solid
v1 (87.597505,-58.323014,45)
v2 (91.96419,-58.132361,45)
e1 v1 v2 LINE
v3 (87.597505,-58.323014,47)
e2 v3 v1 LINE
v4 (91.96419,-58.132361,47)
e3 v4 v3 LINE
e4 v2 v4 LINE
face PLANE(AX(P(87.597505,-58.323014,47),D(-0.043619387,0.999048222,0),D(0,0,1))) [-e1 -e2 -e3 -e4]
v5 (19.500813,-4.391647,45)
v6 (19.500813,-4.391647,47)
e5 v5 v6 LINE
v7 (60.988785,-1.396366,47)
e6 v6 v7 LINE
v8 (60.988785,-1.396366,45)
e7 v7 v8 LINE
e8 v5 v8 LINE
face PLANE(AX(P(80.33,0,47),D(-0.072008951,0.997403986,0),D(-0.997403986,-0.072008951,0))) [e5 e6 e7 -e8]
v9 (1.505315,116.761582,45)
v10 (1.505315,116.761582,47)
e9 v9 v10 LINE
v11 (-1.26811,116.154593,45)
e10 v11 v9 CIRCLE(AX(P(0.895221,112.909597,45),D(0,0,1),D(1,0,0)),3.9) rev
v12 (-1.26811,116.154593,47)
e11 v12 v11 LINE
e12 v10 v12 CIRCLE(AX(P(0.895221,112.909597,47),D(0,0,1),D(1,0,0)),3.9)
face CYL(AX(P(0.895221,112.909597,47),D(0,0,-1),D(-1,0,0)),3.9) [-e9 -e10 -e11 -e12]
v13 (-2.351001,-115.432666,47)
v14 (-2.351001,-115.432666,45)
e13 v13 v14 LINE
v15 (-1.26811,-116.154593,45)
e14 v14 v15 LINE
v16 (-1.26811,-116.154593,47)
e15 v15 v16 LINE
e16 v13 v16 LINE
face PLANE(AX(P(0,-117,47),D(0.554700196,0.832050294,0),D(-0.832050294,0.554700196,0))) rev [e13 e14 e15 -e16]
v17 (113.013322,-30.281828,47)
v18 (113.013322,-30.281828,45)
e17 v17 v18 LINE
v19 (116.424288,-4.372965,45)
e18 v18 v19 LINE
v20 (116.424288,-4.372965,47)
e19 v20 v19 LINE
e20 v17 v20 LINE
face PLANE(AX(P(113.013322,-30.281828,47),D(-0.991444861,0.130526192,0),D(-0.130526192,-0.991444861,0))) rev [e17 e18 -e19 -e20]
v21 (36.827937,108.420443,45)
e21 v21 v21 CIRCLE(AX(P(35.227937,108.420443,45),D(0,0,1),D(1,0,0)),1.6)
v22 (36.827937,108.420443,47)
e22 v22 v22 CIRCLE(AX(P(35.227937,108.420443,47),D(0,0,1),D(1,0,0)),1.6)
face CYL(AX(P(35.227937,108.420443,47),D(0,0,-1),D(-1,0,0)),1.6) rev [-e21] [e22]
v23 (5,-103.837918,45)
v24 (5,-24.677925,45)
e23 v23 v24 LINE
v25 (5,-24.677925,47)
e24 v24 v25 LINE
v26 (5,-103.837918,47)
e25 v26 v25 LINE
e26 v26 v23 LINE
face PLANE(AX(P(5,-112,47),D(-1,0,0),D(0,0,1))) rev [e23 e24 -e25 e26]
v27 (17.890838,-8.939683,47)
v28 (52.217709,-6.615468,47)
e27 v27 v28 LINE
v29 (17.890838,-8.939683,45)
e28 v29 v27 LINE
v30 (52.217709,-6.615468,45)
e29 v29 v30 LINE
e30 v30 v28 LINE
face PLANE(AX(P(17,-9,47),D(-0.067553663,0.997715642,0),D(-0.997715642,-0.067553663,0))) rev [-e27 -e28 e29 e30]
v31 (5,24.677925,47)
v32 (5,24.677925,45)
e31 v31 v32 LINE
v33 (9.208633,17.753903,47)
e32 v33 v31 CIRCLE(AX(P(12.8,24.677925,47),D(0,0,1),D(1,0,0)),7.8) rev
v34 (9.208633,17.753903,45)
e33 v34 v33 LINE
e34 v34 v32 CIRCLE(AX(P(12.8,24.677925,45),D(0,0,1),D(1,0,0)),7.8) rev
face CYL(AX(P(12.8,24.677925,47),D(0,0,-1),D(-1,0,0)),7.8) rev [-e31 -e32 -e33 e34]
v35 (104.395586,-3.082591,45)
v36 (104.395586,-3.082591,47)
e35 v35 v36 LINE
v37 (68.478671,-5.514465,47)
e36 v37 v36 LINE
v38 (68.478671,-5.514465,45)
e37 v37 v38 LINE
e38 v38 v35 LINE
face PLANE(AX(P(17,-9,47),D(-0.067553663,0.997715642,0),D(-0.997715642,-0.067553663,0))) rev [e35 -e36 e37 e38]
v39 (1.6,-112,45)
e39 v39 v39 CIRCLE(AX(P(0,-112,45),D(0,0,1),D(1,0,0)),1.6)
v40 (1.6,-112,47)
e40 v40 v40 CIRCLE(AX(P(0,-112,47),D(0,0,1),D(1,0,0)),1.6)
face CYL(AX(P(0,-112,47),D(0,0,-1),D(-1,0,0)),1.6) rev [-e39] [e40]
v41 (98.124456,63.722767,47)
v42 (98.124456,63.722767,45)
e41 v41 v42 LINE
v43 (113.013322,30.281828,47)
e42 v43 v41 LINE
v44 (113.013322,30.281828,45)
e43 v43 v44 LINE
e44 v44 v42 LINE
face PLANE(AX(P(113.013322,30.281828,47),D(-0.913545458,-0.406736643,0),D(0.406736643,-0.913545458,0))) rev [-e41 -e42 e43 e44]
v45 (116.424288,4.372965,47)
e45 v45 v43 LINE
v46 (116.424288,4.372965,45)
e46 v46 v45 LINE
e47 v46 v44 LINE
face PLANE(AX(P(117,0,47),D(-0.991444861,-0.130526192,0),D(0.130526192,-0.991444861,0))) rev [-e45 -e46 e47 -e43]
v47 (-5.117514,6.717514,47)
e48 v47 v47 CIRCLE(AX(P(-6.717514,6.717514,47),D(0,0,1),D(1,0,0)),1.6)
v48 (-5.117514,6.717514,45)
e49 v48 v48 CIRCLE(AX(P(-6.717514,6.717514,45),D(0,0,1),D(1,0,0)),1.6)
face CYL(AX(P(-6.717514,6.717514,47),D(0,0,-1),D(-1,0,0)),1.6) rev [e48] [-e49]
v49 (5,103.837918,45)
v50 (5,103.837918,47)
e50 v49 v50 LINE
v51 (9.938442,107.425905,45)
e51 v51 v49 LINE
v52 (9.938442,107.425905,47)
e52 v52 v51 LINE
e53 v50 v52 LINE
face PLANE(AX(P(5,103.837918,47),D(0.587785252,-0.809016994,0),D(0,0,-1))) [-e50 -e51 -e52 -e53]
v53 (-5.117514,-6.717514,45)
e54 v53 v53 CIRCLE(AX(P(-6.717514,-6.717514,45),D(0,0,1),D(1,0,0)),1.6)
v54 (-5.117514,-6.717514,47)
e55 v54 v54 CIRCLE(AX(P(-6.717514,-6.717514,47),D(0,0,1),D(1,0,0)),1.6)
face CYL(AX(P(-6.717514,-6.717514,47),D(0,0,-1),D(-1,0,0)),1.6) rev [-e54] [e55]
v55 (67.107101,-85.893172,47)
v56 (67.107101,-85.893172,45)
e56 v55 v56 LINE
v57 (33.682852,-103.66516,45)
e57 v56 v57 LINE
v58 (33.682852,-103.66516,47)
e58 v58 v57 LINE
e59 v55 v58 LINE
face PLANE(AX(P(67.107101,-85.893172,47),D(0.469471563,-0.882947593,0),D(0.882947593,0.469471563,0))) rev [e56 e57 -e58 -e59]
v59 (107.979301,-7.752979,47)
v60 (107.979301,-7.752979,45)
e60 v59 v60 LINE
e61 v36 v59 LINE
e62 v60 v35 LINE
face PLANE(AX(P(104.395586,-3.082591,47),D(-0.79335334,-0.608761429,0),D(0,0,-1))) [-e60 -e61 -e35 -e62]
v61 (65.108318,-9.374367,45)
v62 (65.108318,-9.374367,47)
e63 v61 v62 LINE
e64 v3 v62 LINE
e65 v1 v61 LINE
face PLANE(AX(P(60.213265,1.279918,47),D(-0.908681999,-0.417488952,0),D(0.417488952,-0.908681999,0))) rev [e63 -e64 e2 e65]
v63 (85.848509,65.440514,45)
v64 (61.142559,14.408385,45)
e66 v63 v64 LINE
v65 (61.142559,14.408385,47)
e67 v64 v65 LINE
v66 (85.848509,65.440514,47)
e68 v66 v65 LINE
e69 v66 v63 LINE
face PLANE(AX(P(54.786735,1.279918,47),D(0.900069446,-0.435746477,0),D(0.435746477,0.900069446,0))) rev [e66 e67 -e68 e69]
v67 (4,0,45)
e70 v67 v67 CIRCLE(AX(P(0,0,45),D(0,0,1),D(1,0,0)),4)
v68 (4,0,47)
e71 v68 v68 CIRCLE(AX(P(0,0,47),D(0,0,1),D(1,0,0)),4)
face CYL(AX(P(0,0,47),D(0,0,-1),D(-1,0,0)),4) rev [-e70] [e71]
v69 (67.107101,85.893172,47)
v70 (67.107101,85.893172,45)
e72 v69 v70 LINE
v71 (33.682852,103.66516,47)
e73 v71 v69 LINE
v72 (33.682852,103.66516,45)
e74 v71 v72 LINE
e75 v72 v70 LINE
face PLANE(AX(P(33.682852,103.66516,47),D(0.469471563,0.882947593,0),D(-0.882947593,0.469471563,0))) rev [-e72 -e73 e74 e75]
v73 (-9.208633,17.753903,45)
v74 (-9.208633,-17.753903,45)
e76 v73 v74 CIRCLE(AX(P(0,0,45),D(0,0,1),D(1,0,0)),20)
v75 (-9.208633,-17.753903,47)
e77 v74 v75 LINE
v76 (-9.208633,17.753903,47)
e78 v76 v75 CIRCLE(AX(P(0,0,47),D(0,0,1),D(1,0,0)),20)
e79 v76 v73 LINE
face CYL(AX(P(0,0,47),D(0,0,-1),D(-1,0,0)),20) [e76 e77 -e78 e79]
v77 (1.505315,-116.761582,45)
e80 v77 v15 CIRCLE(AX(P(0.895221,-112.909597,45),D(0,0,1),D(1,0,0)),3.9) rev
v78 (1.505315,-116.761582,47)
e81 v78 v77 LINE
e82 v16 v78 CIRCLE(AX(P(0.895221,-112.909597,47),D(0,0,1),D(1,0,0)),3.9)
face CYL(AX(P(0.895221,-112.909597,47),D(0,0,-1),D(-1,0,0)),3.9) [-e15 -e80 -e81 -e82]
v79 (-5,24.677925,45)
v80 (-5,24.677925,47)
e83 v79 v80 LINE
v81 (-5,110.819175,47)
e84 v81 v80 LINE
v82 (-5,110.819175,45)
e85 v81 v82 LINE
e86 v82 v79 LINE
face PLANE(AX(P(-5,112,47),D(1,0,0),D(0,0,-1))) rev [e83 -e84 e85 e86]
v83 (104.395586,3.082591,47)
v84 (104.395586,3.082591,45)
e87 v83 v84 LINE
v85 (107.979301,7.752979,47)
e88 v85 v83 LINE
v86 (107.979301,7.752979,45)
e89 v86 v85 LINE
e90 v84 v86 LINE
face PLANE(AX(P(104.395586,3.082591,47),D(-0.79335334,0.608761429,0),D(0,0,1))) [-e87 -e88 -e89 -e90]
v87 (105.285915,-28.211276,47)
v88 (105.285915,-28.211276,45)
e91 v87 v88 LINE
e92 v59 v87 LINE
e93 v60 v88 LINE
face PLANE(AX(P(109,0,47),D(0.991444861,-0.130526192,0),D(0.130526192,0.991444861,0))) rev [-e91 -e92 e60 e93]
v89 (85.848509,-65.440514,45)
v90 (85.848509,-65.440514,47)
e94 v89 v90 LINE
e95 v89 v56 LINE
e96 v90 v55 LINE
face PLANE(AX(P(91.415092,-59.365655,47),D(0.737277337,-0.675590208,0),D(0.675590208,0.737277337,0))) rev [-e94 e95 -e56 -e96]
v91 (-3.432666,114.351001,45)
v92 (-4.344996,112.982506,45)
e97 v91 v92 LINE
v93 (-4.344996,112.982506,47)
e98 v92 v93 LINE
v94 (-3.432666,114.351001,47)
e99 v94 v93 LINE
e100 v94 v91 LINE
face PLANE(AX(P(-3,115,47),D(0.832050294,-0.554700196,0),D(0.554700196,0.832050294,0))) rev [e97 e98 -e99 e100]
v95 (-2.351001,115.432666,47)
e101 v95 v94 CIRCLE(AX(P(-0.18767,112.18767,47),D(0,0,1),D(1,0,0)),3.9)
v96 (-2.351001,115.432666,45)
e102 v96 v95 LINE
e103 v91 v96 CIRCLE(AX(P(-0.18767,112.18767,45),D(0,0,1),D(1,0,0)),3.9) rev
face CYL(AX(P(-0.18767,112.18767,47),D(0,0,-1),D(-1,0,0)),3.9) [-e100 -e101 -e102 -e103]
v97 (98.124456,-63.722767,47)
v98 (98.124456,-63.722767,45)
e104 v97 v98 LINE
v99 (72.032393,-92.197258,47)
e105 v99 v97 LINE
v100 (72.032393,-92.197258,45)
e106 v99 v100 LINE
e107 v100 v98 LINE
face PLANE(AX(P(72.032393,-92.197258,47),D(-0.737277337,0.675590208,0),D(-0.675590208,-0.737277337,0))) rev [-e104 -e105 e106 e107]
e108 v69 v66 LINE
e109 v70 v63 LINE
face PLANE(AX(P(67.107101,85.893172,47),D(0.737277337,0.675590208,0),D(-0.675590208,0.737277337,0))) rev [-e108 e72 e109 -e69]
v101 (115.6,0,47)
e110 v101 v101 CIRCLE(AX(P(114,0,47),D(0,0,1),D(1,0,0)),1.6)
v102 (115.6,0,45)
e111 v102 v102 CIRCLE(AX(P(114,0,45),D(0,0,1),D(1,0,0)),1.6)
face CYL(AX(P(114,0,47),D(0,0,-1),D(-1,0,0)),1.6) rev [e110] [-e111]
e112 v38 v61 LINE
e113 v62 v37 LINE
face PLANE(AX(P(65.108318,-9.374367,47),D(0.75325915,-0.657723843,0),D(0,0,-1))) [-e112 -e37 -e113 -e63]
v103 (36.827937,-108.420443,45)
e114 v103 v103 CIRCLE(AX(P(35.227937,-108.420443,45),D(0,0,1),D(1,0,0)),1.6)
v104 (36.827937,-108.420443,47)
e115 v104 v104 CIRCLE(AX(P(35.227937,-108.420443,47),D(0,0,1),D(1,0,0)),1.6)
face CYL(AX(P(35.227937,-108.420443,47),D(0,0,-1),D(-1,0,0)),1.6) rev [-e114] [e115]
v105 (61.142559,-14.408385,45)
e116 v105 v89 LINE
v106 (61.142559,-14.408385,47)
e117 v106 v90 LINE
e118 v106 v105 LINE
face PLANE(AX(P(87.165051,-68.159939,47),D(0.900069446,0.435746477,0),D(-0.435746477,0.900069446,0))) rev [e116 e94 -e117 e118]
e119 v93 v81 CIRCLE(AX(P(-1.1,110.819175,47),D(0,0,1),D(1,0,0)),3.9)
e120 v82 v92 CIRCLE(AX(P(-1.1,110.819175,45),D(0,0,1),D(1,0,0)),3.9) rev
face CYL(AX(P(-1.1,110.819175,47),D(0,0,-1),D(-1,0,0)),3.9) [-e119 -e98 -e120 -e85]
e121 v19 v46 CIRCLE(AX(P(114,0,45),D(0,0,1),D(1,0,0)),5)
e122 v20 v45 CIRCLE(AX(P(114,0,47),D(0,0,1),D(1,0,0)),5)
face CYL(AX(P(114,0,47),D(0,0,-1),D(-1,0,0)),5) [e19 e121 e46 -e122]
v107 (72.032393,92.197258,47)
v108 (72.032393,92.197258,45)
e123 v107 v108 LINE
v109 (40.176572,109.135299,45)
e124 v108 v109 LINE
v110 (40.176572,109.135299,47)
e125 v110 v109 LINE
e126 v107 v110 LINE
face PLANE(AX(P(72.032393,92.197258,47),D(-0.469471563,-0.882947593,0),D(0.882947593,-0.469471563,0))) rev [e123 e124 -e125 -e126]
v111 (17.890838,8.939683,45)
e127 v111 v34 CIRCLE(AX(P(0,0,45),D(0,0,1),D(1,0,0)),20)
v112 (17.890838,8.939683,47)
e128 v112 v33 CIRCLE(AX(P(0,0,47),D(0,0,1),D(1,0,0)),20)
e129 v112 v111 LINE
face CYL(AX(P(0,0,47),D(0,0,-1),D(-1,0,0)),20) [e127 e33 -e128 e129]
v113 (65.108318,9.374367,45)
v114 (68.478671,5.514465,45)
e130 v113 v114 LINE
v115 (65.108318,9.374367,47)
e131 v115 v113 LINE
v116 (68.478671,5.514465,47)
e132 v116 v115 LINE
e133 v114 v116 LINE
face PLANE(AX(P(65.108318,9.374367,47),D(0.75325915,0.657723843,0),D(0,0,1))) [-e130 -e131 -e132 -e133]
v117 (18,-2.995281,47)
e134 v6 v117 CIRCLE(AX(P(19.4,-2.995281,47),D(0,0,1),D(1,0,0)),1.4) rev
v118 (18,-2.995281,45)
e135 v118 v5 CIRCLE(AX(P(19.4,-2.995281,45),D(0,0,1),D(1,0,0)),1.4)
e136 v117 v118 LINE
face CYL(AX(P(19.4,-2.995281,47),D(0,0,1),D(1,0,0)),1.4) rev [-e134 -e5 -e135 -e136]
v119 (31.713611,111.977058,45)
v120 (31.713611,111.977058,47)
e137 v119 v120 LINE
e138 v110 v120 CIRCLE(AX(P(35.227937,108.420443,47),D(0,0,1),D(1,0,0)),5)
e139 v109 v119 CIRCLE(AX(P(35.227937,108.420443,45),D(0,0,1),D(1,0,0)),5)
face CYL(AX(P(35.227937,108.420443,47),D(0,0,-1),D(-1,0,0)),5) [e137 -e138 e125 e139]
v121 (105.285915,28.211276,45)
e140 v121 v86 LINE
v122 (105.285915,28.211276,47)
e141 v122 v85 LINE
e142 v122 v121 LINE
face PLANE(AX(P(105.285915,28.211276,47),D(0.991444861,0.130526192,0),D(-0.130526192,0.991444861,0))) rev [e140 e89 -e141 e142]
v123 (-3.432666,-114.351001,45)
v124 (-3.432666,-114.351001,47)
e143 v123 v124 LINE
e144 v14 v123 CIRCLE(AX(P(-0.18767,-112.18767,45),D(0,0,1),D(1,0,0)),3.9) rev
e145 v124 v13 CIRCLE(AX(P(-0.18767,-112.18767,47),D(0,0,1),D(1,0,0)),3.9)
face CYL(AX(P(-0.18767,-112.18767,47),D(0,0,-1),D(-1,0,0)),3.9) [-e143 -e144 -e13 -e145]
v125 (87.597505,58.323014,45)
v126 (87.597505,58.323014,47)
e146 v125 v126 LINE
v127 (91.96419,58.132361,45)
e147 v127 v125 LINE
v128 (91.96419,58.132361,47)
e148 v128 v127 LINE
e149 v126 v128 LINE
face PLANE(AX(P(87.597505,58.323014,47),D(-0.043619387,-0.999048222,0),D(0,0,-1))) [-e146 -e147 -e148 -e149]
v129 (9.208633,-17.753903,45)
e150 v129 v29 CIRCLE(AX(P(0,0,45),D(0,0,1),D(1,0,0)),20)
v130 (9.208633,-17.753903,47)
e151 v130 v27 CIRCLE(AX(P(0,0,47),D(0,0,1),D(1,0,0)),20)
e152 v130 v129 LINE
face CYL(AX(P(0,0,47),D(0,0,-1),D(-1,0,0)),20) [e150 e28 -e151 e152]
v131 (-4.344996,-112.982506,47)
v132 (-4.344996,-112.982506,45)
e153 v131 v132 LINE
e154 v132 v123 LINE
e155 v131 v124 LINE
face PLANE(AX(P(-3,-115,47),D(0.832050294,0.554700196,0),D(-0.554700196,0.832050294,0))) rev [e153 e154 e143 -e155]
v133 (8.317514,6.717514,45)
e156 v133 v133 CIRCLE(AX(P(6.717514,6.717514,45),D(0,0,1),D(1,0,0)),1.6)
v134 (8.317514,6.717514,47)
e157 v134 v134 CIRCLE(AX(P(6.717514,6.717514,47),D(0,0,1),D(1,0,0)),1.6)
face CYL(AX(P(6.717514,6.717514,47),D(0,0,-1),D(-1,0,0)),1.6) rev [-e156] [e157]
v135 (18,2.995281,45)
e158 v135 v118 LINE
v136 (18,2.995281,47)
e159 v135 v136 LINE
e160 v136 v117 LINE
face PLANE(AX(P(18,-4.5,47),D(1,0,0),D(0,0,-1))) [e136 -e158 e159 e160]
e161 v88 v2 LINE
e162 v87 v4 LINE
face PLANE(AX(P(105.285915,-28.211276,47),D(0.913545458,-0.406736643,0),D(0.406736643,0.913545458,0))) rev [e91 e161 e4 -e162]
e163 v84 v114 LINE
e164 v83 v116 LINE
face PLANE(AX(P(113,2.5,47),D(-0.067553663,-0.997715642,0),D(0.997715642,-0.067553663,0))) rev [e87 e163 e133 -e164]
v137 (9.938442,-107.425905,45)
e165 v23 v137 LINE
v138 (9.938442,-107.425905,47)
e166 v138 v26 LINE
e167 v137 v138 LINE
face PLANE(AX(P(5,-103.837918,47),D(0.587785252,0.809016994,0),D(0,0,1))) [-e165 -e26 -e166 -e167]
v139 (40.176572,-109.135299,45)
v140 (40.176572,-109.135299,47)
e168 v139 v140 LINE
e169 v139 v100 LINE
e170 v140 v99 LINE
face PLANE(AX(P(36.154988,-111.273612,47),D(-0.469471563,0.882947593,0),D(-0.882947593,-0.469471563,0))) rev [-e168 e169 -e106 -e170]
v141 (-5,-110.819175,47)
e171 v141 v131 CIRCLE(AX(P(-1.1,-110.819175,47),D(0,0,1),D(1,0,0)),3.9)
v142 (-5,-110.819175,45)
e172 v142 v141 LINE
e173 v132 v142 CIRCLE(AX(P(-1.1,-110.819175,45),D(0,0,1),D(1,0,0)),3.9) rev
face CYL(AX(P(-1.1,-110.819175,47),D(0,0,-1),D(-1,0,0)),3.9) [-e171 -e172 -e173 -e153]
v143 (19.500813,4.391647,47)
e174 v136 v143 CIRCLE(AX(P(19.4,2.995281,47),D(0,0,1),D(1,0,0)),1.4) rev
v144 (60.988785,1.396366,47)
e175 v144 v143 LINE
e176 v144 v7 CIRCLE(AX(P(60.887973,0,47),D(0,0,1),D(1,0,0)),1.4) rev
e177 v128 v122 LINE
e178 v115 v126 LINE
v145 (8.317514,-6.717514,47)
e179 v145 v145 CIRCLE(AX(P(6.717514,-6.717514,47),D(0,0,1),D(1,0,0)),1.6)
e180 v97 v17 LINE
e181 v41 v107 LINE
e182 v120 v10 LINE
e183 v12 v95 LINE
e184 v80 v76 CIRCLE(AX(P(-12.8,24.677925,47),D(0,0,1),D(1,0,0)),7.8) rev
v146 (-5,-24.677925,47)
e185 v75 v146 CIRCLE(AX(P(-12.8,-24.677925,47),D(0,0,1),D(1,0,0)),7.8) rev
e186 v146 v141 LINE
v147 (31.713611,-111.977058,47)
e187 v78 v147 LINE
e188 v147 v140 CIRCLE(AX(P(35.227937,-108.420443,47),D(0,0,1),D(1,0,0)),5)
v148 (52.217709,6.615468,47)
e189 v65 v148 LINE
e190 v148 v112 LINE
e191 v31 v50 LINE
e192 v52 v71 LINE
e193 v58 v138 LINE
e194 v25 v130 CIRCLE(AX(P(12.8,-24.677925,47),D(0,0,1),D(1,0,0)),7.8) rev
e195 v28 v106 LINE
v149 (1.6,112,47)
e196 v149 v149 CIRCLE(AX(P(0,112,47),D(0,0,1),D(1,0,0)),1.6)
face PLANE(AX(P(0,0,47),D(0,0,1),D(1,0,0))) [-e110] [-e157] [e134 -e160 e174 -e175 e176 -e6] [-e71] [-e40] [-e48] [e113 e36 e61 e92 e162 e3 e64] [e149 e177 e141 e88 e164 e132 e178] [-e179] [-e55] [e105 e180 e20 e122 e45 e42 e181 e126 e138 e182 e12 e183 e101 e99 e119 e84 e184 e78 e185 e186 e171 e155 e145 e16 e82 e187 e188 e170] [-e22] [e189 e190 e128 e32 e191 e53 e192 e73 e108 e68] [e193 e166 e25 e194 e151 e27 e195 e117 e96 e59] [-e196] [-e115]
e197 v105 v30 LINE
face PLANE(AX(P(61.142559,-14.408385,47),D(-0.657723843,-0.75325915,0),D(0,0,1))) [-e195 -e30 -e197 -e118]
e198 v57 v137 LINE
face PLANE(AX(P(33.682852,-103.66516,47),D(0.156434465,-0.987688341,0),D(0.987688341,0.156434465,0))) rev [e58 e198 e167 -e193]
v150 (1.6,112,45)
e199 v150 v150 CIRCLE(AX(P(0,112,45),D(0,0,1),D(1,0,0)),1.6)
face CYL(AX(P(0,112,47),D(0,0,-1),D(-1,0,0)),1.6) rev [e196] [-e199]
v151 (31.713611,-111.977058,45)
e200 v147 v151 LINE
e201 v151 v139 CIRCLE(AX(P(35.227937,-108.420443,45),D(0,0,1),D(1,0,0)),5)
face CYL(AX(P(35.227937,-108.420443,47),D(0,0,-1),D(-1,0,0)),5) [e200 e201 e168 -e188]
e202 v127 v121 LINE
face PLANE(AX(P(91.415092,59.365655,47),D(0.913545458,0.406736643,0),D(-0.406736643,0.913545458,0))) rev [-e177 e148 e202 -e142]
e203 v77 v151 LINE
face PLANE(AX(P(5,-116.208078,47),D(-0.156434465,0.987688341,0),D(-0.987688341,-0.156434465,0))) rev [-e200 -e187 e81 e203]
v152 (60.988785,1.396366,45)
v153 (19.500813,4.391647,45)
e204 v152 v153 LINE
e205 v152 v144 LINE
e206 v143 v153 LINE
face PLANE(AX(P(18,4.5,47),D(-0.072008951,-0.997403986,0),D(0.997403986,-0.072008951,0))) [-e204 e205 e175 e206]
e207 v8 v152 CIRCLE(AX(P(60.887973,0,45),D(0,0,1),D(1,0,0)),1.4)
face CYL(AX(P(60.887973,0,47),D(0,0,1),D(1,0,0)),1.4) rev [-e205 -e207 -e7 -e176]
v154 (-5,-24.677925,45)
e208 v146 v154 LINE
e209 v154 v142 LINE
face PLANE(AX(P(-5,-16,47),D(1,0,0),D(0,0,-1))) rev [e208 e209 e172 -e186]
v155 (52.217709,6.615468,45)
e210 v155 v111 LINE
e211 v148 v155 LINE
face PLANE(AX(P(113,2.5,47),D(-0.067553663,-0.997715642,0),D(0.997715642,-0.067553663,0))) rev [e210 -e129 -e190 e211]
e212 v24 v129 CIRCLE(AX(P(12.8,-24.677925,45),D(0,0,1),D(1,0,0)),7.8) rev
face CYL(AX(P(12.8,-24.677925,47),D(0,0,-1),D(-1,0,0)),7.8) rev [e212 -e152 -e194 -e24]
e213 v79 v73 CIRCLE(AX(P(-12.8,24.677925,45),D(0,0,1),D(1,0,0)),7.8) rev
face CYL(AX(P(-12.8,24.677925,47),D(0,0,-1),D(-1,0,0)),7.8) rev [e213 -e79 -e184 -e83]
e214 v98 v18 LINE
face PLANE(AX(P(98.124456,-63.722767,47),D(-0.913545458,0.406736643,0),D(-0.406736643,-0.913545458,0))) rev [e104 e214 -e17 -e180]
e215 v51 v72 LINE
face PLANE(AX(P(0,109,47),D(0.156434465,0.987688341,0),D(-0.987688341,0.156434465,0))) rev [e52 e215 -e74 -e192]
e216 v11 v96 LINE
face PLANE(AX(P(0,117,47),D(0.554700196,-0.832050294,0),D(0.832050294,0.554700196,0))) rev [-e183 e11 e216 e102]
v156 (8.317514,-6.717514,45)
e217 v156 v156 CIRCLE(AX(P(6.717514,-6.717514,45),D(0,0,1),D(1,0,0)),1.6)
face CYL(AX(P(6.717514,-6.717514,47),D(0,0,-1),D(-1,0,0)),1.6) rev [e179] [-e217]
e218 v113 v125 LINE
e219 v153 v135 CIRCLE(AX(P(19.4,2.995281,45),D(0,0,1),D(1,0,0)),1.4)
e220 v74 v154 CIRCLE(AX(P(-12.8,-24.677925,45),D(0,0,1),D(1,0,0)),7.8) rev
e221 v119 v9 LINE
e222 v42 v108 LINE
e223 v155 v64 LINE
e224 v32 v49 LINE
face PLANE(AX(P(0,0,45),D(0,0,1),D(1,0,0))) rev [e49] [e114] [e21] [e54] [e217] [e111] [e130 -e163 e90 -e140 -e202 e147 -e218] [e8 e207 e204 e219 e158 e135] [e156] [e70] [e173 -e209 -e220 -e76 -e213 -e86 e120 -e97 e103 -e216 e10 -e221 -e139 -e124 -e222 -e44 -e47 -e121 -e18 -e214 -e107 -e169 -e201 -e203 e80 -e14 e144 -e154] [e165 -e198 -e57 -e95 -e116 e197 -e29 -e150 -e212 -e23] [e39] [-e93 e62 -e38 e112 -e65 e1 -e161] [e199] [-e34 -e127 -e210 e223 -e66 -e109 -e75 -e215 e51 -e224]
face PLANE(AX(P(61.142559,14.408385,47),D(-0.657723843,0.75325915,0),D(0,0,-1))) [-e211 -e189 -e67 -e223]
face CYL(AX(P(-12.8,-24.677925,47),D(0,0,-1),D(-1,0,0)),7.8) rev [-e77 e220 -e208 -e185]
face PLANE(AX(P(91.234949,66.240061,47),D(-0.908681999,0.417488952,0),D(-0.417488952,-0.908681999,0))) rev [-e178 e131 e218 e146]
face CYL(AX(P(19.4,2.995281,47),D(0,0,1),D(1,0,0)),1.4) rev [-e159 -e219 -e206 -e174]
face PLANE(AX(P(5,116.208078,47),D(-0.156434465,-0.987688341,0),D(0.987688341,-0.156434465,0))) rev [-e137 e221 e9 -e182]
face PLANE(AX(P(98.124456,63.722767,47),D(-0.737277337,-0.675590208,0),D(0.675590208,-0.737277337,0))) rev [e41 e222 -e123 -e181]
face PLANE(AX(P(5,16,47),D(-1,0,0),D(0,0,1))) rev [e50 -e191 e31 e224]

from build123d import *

# Parameters (mm, degrees)
EXTRUDE_180_DEPTH      = 8
EXTRUDE_START          = 8
SKETCH_2_W             = 6
SKETCH_2_H             = 4
EXTRUDE_456_DEPTH      = 36
EXTRUDE_START_2        = 44
EXTRUDE_180_2_DEPTH    = 3
SKETCH_4_R             = 20
SKETCH_4_R_2           = 4
EXTRUDE_691_DEPTH      = 3
EXTRUDE_744_DEPTH      = 3
SKETCH_6_W             = 10
SKETCH_6_H             = 96
EXTRUDE_1_DEPTH        = 3
EXTRUDE_Y_1_DEPTH      = 3
SKETCH_8_W             = 10
SKETCH_8_H             = 96
EXTRUDE_1_2_DEPTH      = 3
EXTRUDE_Y_1_2_DEPTH    = 3
CUT_EXTRUDE_START      = 44
CUT_EXTRUDE_1136_DEPTH = 3
EXTRUDE_1227_DEPTH     = 3
SKETCH_12_R            = 5
EXTRUDE_1296_DEPTH     = 8
SKETCH_13_R            = 1.6
CUT_EXTRUDE_1367_DEPTH = 3
SKETCH_14_R            = 1.6
CUT_EXTRUDE_1428_DEPTH = 8
SKETCH_15_W            = 600
SKETCH_15_H            = 600
CUT_EXTRUDE_1488_DEPTH = 44
F_2MM_START            = 44
F_2MM_DEPTH            = 3
SKETCH_17_R            = 5
EXTRUDE_M3_DEPTH       = 3
SKETCH_18_R            = 5
EXTRUDE_3_DEPTH        = 3
SKETCH_19_R            = 5
EXTRUDE_4_DEPTH        = 3
SKETCH_20_R            = 1.6
CUT_EXTRUDE_M3_DEPTH   = 3
R7P8_75_R              = 7.8
R3P9_R                 = 3.9
F_2MM_45_47_START      = 44
SKETCH_21_W            = 600
SKETCH_21_H            = 600
F_2MM_45_47_DEPTH      = 1
FILLET_1_R             = 1.4
CHAMFER_1_SIZE         = 5
CHAMFER_1_SIZE_2       = 4.246045496
CHAMFER_1_SIZE_3       = 3.817956769
CHAMFER_1_SIZE_4       = 4.370160244
CHAMFER_1_SIZE_5       = 3.876090347
CHAMFER_1_SIZE_6       = 9.033398393


with BuildPart() as part:
    # 草图1 → Extrude 180 (new body)
    with BuildSketch(Plane.XY):
        Polygon((0, -115), (35.536954353, -109.371499374), (70.801069662, -90.621236665), (96.447115314, -62.633489027), (111.081470023, -29.764190187), (115, 0), (111.081470023, 29.764190187), (96.447115314, 62.633489027), (70.801069662, 90.621236665), (35.536954353, 109.371499374), (0, 115), (0, 111), (34.300886376, 105.567273309), (68.338423761, 87.46919365), (93.092433042, 60.454932887), (107.217766718, 28.728914006), (111, 0), (107.217766718, -28.728914006), (93.092433042, -60.454932887), (68.338423761, -87.46919365), (34.300886376, -105.567273309), (0, -111), align=None)
    extrude(amount=EXTRUDE_180_DEPTH)

    # 草图2 → Extrude 456 (add)
    with BuildSketch(Plane.XY.offset(EXTRUDE_START)):
        Polygon((35.584965419, -103.047126287), (37.439067386, -108.753465385), (33.634841321, -109.989533363), (31.780739354, -104.283194265), align=None)
        with Locations((112, 0)):
            Rectangle(SKETCH_2_W, SKETCH_2_H)
        Polygon((31.780739354, 104.283194265), (33.634841321, 109.989533363), (37.439067386, 108.753465385), (35.584965419, 103.047126287), align=None)
    extrude(amount=EXTRUDE_456_DEPTH)

    # 草图3 → Extrude 180 2 (add)
    with BuildSketch(Plane.XY.offset(EXTRUDE_START_2)):
        Polygon((0, -115), (35.536954353, -109.371499374), (70.801069662, -90.621236665), (96.447115314, -62.633489027), (111.081470023, -29.764190187), (115, 0), (111.081470023, 29.764190187), (96.447115314, 62.633489027), (70.801069662, 90.621236665), (35.536954353, 109.371499374), (0, 115), (0, 109), (33.682852387, 103.665160276), (67.10710081, 85.893172143), (91.415091906, 59.365654817), (105.285915066, 28.211275916), (109, 0), (105.285915066, -28.211275916), (91.415091906, -59.365654817), (67.10710081, -85.893172143), (33.682852387, -103.665160276), (0, -109), align=None)
    extrude(amount=EXTRUDE_180_2_DEPTH)



with BuildPart() as body_2:
    # 草图4 → Extrude 691 (new body)
    with BuildSketch(Plane.XY.offset(EXTRUDE_START_2)):
        Circle(SKETCH_4_R)
        Circle(SKETCH_4_R_2, mode=Mode.SUBTRACT)
    extrude(amount=EXTRUDE_691_DEPTH)


with BuildPart() as part_1:
    add(part.part)

    add(body_2.part)  # Extrude 744 merges body 2
    # 草图5 → Extrude 744 (add)
    with BuildSketch(Plane.XY.offset(EXTRUDE_START_2)):
        Polygon((17, -9), (113, -2.5), (113, 2.5), (17, 9), align=None)
    extrude(amount=EXTRUDE_744_DEPTH)

    # 草图6 → Extrude 1 (add)
    with BuildSketch(Plane.XY.offset(EXTRUDE_START_2)):
        with Locations((0, -64)):
            Rectangle(SKETCH_6_W, SKETCH_6_H)
    extrude(amount=EXTRUDE_1_DEPTH)

    # 草图7 → Extrude Y__-1 (add)
    with BuildSketch(Plane.XY.offset(EXTRUDE_START_2)):
        Polygon((60.213265383, 1.279918343), (91.234949037, -66.240061243), (87.165050963, -68.159938757), (54.786734617, -1.279918343), align=None)
    extrude(amount=EXTRUDE_Y_1_DEPTH)

    # 草图8 → Extrude 1 2 (add)
    with BuildSketch(Plane.XY.offset(EXTRUDE_START_2)):
        with Locations((0, 64)):
            Rectangle(SKETCH_8_W, SKETCH_8_H)
    extrude(amount=EXTRUDE_1_2_DEPTH)

    # 草图9 → Extrude Y__1 2 (add)
    with BuildSketch(Plane.XY.offset(EXTRUDE_START_2)):
        Polygon((54.786734617, 1.279918343), (87.165050963, 68.159938757), (91.234949037, 66.240061243), (60.213265383, -1.279918343), align=None)
    extrude(amount=EXTRUDE_Y_1_2_DEPTH)

    # 草图10 → Cut-Extrude 1136 (cut)
    with BuildSketch(Plane.XY.offset(CUT_EXTRUDE_START)):
        Polygon((18, -4.5), (18, 4.5), (80.33, 0), align=None)
    extrude(amount=CUT_EXTRUDE_1136_DEPTH, mode=Mode.SUBTRACT)

    # 草图11 → Extrude 1227 (add)
    with BuildSketch(Plane.XY.offset(EXTRUDE_START_2)):
        Polygon((-5, -107), (5, -107), (5, -116.208077798), (0, -117), (-3, -115), (-5, -112), align=None)
        Polygon((-5, 107), (5, 107), (5, 116.208077798), (0, 117), (-3, 115), (-5, 112), align=None)
    extrude(amount=EXTRUDE_1227_DEPTH)

    # 草图12 → Extrude 1296 (add)
    with BuildSketch(Plane.XY):
        with Locations((0, 112)):
            Circle(SKETCH_12_R)
        with Locations((0, -112)):
            Circle(SKETCH_12_R)
    extrude(amount=EXTRUDE_1296_DEPTH)

    # 草图13 → Cut-Extrude 1367 (cut)
    with BuildSketch(Plane.XY.offset(CUT_EXTRUDE_START)):
        with Locations((0, 112)):
            Circle(SKETCH_13_R)
        with Locations((0, -112)):
            Circle(SKETCH_13_R)
        with Locations((-6.717514421, -6.717514421)):
            Circle(SKETCH_13_R)
        with Locations((-6.717514421, 6.717514421)):
            Circle(SKETCH_13_R)
        with Locations((6.717514421, -6.717514421)):
            Circle(SKETCH_13_R)
        with Locations((6.717514421, 6.717514421)):
            Circle(SKETCH_13_R)
    extrude(amount=CUT_EXTRUDE_1367_DEPTH, mode=Mode.SUBTRACT)

    # 草图14 → Cut-Extrude 1428 (cut)
    with BuildSketch(Plane.XY):
        with Locations((0, 112)):
            Circle(SKETCH_14_R)
        with Locations((0, -112)):
            Circle(SKETCH_14_R)
    extrude(amount=CUT_EXTRUDE_1428_DEPTH, mode=Mode.SUBTRACT)

    # 草图15 → Cut-Extrude 1488 (cut)
    with BuildSketch(Plane.XY):
        Rectangle(SKETCH_15_W, SKETCH_15_H)
    extrude(amount=CUT_EXTRUDE_1488_DEPTH, mode=Mode.SUBTRACT)

    # 草图16 → 外圈径向加厚2mm (add)
    with BuildSketch(Plane.XY.offset(F_2MM_START)):
        Polygon((0, -117), (36.154988342, -111.273612407), (72.032392613, -92.197258172), (98.12445645, -63.722767097), (113.013321676, -30.281828277), (117, 0), (113.013321676, 30.281828277), (98.12445645, 63.722767097), (72.032392613, 92.197258172), (36.154988342, 111.273612407), (0, 117), (0, 114), (35.227937359, 108.420442858), (70.185408187, 89.833225911), (95.608444746, 62.088849992), (110.115544197, 29.505371142), (114, 0), (110.115544197, -29.505371142), (95.608444746, -62.088849992), (70.185408187, -89.833225911), (35.227937359, -108.420442858), (0, -114), align=None)
    extrude(amount=F_2MM_DEPTH)

    # 草图17 → M3铝柱上定位耳 (add)
    with BuildSketch(Plane.XY.offset(EXTRUDE_START_2)):
        with Locations((35.227937359, -108.420442858)):
            Circle(SKETCH_17_R)
    extrude(amount=EXTRUDE_M3_DEPTH)

    # 草图18 → 凸台-拉伸3 (add)
    with BuildSketch(Plane.XY.offset(EXTRUDE_START_2)):
        with Locations((114, 0)):
            Circle(SKETCH_18_R)
    extrude(amount=EXTRUDE_3_DEPTH)

    # 草图19 → 凸台-拉伸4 (add)
    with BuildSketch(Plane.XY.offset(EXTRUDE_START_2)):
        with Locations((35.227937359, 108.420442858)):
            Circle(SKETCH_19_R)
    extrude(amount=EXTRUDE_4_DEPTH)

    # 草图20 → 三处M3上层固定孔 (cut)
    with BuildSketch(Plane.XY.offset(CUT_EXTRUDE_START)):
        with Locations((35.227937359, -108.420442858)):
            Circle(SKETCH_20_R)
        with Locations((114, 0)):
            Circle(SKETCH_20_R)
        with Locations((35.227937359, 108.420442858)):
            Circle(SKETCH_20_R)
    extrude(amount=CUT_EXTRUDE_M3_DEPTH, mode=Mode.SUBTRACT)

    # 外侧梁根部圆角_R7p8_参考75度桨保
    r7p8_75_edges = [part_1.edges().sort_by_distance(p)[0] for p in [
        (5, -19.364916731, 45.5),
        (-5, -19.364916731, 45.5),
        (-5, 19.364916731, 45.5),
        (5, 19.364916731, 45.5),
    ]]
    fillet(r7p8_75_edges, radius=R7P8_75_R)

    # 端耳外缘圆角_R3p9_轮廓内收
    r3p9_edges = [part_1.edges().sort_by_distance(p)[0] for p in [
        (-5, -112, 45.5),
        (-5, 112, 45.5),
        (-3, -115, 45.5),
        (0, -117, 45.5),
        (0, 117, 45.5),
        (-3, 115, 45.5),
    ]]
    fillet(r3p9_edges, radius=R3P9_R)

    # 草图21 → 统一2mm板厚_上层保留45至47 (cut)
    with BuildSketch(Plane.XY.offset(F_2MM_45_47_START)):
        Rectangle(SKETCH_21_W, SKETCH_21_H)
    extrude(amount=F_2MM_45_47_DEPTH, mode=Mode.SUBTRACT)

    # 圆角1
    fillet_1_edges = [part_1.edges().sort_by_distance(p)[0] for p in [
        (18, -4.5, 46),
        (80.33, 0, 46),
        (18, 4.5, 46),
    ]]
    fillet(fillet_1_edges, radius=FILLET_1_R)

    # 倒角1
    # the kernel refuses this chamfer: 9.033398393, 5, 4.370160244, 4.246045496, 3.876090347, 3.817956769 mm, written as the material it adds along each edge
    with BuildSketch(Plane(origin=(108.631931923, -2.795754609, 45), x_dir=(-0.10321619689960815, -0.9946589449140752, 0), z_dir=(0, 0, 1))) as chamfer_1_piece_1:
        Polygon((CHAMFER_1_SIZE * 0.999621916911, -CHAMFER_1_SIZE * 0.0274958766106), (CHAMFER_1_SIZE_2 * 0.17017326961, -CHAMFER_1_SIZE_2 * 0.985414155772), (0, 0), align=None)
    extrude(amount=2)
    with BuildSketch(Plane(origin=(108.631931923, 2.795754609, 47), x_dir=(-0.9995678495067102, 0.02939581998398161, 0), z_dir=(0, 0, -1))) as chamfer_1_piece_2:
        Polygon((CHAMFER_1_SIZE_2 * 0.999270274205, CHAMFER_1_SIZE_2 * 0.0381958005112), (CHAMFER_1_SIZE * 0.159614119931, CHAMFER_1_SIZE * 0.987179483538), (0, 0), align=None)
    extrude(amount=2)
    with BuildSketch(Plane(origin=(89.191460159, -61.792323046, 45), x_dir=(0.6956068650639778, 0.7184226397294735, 0), z_dir=(0, 0, 1))) as chamfer_1_piece_3:
        Polygon((CHAMFER_1_SIZE * 0.999621916911, CHAMFER_1_SIZE * 0.0274958766106), (CHAMFER_1_SIZE_3 * 0.36240953925, CHAMFER_1_SIZE_3 * 0.932018951466), (0, 0), align=None)
    extrude(amount=2)
    with BuildSketch(Plane(origin=(89.191460159, 61.792323046, 47), x_dir=(-0.4601932489228402, -0.8878187729744403, 0), z_dir=(0, 0, -1))) as chamfer_1_piece_4:
        Polygon((CHAMFER_1_SIZE_3 * 0.998870534427, -CHAMFER_1_SIZE_3 * 0.0475147922669), (CHAMFER_1_SIZE * 0.343666607926, -CHAMFER_1_SIZE * 0.939091722143), (0, 0), align=None)
    extrude(amount=2)
    with BuildSketch(Plane(origin=(5, -108.208077798, 47), x_dir=(-0.03603131014618112, 0.9993506615243469, 0), z_dir=(0, 0, -1)), Plane(origin=(5, 108.208077798, 45), x_dir=(-0.0360313101461817, -0.9993506615243467, 0), z_dir=(0, 0, 1))) as chamfer_1_piece_5:
        Polygon((CHAMFER_1_SIZE_4 * 0.999350661636, CHAMFER_1_SIZE_4 * 0.0360313101502), (CHAMFER_1_SIZE * 0.120745181195, CHAMFER_1_SIZE * 0.992683535281), (0, 0), align=None)
    extrude(amount=2)
    with BuildSketch(Plane(origin=(63.490093255, 5.852233269, 45), x_dir=(0.37520935392057214, 0.9269400955458269, 0), z_dir=(0, 0, 1)), Plane(origin=(63.490093255, -5.852233269, 47), x_dir=(0.37520935392056365, -0.9269400955458303, 0), z_dir=(0, 0, -1))) as chamfer_1_piece_6:
        Polygon((CHAMFER_1_SIZE_5 * 0.998939538699, -CHAMFER_1_SIZE_5 * 0.0460412632699), (CHAMFER_1_SIZE * 0.311734042399, -CHAMFER_1_SIZE * 0.950169399007), (0, 0), align=None)
    extrude(amount=2)
    with BuildSketch(Plane(origin=(57.2062873, -6.277699297, 45), x_dir=(-0.9998189901573707, -0.0190259538708392, 0), z_dir=(0, 0, 1)), Plane(origin=(57.2062873, 6.277699297, 47), x_dir=(-0.9998189901573707, 0.019025953870838982, 0), z_dir=(0, 0, -1))) as chamfer_1_piece_7:
        Polygon((CHAMFER_1_SIZE * 0.998820318674, CHAMFER_1_SIZE * 0.0485589436086), (-CHAMFER_1_SIZE_6 * 0.418542922597, CHAMFER_1_SIZE_6 * 0.908197017112), (0, 0), align=None)
    extrude(amount=2)


solid = part_1.part
